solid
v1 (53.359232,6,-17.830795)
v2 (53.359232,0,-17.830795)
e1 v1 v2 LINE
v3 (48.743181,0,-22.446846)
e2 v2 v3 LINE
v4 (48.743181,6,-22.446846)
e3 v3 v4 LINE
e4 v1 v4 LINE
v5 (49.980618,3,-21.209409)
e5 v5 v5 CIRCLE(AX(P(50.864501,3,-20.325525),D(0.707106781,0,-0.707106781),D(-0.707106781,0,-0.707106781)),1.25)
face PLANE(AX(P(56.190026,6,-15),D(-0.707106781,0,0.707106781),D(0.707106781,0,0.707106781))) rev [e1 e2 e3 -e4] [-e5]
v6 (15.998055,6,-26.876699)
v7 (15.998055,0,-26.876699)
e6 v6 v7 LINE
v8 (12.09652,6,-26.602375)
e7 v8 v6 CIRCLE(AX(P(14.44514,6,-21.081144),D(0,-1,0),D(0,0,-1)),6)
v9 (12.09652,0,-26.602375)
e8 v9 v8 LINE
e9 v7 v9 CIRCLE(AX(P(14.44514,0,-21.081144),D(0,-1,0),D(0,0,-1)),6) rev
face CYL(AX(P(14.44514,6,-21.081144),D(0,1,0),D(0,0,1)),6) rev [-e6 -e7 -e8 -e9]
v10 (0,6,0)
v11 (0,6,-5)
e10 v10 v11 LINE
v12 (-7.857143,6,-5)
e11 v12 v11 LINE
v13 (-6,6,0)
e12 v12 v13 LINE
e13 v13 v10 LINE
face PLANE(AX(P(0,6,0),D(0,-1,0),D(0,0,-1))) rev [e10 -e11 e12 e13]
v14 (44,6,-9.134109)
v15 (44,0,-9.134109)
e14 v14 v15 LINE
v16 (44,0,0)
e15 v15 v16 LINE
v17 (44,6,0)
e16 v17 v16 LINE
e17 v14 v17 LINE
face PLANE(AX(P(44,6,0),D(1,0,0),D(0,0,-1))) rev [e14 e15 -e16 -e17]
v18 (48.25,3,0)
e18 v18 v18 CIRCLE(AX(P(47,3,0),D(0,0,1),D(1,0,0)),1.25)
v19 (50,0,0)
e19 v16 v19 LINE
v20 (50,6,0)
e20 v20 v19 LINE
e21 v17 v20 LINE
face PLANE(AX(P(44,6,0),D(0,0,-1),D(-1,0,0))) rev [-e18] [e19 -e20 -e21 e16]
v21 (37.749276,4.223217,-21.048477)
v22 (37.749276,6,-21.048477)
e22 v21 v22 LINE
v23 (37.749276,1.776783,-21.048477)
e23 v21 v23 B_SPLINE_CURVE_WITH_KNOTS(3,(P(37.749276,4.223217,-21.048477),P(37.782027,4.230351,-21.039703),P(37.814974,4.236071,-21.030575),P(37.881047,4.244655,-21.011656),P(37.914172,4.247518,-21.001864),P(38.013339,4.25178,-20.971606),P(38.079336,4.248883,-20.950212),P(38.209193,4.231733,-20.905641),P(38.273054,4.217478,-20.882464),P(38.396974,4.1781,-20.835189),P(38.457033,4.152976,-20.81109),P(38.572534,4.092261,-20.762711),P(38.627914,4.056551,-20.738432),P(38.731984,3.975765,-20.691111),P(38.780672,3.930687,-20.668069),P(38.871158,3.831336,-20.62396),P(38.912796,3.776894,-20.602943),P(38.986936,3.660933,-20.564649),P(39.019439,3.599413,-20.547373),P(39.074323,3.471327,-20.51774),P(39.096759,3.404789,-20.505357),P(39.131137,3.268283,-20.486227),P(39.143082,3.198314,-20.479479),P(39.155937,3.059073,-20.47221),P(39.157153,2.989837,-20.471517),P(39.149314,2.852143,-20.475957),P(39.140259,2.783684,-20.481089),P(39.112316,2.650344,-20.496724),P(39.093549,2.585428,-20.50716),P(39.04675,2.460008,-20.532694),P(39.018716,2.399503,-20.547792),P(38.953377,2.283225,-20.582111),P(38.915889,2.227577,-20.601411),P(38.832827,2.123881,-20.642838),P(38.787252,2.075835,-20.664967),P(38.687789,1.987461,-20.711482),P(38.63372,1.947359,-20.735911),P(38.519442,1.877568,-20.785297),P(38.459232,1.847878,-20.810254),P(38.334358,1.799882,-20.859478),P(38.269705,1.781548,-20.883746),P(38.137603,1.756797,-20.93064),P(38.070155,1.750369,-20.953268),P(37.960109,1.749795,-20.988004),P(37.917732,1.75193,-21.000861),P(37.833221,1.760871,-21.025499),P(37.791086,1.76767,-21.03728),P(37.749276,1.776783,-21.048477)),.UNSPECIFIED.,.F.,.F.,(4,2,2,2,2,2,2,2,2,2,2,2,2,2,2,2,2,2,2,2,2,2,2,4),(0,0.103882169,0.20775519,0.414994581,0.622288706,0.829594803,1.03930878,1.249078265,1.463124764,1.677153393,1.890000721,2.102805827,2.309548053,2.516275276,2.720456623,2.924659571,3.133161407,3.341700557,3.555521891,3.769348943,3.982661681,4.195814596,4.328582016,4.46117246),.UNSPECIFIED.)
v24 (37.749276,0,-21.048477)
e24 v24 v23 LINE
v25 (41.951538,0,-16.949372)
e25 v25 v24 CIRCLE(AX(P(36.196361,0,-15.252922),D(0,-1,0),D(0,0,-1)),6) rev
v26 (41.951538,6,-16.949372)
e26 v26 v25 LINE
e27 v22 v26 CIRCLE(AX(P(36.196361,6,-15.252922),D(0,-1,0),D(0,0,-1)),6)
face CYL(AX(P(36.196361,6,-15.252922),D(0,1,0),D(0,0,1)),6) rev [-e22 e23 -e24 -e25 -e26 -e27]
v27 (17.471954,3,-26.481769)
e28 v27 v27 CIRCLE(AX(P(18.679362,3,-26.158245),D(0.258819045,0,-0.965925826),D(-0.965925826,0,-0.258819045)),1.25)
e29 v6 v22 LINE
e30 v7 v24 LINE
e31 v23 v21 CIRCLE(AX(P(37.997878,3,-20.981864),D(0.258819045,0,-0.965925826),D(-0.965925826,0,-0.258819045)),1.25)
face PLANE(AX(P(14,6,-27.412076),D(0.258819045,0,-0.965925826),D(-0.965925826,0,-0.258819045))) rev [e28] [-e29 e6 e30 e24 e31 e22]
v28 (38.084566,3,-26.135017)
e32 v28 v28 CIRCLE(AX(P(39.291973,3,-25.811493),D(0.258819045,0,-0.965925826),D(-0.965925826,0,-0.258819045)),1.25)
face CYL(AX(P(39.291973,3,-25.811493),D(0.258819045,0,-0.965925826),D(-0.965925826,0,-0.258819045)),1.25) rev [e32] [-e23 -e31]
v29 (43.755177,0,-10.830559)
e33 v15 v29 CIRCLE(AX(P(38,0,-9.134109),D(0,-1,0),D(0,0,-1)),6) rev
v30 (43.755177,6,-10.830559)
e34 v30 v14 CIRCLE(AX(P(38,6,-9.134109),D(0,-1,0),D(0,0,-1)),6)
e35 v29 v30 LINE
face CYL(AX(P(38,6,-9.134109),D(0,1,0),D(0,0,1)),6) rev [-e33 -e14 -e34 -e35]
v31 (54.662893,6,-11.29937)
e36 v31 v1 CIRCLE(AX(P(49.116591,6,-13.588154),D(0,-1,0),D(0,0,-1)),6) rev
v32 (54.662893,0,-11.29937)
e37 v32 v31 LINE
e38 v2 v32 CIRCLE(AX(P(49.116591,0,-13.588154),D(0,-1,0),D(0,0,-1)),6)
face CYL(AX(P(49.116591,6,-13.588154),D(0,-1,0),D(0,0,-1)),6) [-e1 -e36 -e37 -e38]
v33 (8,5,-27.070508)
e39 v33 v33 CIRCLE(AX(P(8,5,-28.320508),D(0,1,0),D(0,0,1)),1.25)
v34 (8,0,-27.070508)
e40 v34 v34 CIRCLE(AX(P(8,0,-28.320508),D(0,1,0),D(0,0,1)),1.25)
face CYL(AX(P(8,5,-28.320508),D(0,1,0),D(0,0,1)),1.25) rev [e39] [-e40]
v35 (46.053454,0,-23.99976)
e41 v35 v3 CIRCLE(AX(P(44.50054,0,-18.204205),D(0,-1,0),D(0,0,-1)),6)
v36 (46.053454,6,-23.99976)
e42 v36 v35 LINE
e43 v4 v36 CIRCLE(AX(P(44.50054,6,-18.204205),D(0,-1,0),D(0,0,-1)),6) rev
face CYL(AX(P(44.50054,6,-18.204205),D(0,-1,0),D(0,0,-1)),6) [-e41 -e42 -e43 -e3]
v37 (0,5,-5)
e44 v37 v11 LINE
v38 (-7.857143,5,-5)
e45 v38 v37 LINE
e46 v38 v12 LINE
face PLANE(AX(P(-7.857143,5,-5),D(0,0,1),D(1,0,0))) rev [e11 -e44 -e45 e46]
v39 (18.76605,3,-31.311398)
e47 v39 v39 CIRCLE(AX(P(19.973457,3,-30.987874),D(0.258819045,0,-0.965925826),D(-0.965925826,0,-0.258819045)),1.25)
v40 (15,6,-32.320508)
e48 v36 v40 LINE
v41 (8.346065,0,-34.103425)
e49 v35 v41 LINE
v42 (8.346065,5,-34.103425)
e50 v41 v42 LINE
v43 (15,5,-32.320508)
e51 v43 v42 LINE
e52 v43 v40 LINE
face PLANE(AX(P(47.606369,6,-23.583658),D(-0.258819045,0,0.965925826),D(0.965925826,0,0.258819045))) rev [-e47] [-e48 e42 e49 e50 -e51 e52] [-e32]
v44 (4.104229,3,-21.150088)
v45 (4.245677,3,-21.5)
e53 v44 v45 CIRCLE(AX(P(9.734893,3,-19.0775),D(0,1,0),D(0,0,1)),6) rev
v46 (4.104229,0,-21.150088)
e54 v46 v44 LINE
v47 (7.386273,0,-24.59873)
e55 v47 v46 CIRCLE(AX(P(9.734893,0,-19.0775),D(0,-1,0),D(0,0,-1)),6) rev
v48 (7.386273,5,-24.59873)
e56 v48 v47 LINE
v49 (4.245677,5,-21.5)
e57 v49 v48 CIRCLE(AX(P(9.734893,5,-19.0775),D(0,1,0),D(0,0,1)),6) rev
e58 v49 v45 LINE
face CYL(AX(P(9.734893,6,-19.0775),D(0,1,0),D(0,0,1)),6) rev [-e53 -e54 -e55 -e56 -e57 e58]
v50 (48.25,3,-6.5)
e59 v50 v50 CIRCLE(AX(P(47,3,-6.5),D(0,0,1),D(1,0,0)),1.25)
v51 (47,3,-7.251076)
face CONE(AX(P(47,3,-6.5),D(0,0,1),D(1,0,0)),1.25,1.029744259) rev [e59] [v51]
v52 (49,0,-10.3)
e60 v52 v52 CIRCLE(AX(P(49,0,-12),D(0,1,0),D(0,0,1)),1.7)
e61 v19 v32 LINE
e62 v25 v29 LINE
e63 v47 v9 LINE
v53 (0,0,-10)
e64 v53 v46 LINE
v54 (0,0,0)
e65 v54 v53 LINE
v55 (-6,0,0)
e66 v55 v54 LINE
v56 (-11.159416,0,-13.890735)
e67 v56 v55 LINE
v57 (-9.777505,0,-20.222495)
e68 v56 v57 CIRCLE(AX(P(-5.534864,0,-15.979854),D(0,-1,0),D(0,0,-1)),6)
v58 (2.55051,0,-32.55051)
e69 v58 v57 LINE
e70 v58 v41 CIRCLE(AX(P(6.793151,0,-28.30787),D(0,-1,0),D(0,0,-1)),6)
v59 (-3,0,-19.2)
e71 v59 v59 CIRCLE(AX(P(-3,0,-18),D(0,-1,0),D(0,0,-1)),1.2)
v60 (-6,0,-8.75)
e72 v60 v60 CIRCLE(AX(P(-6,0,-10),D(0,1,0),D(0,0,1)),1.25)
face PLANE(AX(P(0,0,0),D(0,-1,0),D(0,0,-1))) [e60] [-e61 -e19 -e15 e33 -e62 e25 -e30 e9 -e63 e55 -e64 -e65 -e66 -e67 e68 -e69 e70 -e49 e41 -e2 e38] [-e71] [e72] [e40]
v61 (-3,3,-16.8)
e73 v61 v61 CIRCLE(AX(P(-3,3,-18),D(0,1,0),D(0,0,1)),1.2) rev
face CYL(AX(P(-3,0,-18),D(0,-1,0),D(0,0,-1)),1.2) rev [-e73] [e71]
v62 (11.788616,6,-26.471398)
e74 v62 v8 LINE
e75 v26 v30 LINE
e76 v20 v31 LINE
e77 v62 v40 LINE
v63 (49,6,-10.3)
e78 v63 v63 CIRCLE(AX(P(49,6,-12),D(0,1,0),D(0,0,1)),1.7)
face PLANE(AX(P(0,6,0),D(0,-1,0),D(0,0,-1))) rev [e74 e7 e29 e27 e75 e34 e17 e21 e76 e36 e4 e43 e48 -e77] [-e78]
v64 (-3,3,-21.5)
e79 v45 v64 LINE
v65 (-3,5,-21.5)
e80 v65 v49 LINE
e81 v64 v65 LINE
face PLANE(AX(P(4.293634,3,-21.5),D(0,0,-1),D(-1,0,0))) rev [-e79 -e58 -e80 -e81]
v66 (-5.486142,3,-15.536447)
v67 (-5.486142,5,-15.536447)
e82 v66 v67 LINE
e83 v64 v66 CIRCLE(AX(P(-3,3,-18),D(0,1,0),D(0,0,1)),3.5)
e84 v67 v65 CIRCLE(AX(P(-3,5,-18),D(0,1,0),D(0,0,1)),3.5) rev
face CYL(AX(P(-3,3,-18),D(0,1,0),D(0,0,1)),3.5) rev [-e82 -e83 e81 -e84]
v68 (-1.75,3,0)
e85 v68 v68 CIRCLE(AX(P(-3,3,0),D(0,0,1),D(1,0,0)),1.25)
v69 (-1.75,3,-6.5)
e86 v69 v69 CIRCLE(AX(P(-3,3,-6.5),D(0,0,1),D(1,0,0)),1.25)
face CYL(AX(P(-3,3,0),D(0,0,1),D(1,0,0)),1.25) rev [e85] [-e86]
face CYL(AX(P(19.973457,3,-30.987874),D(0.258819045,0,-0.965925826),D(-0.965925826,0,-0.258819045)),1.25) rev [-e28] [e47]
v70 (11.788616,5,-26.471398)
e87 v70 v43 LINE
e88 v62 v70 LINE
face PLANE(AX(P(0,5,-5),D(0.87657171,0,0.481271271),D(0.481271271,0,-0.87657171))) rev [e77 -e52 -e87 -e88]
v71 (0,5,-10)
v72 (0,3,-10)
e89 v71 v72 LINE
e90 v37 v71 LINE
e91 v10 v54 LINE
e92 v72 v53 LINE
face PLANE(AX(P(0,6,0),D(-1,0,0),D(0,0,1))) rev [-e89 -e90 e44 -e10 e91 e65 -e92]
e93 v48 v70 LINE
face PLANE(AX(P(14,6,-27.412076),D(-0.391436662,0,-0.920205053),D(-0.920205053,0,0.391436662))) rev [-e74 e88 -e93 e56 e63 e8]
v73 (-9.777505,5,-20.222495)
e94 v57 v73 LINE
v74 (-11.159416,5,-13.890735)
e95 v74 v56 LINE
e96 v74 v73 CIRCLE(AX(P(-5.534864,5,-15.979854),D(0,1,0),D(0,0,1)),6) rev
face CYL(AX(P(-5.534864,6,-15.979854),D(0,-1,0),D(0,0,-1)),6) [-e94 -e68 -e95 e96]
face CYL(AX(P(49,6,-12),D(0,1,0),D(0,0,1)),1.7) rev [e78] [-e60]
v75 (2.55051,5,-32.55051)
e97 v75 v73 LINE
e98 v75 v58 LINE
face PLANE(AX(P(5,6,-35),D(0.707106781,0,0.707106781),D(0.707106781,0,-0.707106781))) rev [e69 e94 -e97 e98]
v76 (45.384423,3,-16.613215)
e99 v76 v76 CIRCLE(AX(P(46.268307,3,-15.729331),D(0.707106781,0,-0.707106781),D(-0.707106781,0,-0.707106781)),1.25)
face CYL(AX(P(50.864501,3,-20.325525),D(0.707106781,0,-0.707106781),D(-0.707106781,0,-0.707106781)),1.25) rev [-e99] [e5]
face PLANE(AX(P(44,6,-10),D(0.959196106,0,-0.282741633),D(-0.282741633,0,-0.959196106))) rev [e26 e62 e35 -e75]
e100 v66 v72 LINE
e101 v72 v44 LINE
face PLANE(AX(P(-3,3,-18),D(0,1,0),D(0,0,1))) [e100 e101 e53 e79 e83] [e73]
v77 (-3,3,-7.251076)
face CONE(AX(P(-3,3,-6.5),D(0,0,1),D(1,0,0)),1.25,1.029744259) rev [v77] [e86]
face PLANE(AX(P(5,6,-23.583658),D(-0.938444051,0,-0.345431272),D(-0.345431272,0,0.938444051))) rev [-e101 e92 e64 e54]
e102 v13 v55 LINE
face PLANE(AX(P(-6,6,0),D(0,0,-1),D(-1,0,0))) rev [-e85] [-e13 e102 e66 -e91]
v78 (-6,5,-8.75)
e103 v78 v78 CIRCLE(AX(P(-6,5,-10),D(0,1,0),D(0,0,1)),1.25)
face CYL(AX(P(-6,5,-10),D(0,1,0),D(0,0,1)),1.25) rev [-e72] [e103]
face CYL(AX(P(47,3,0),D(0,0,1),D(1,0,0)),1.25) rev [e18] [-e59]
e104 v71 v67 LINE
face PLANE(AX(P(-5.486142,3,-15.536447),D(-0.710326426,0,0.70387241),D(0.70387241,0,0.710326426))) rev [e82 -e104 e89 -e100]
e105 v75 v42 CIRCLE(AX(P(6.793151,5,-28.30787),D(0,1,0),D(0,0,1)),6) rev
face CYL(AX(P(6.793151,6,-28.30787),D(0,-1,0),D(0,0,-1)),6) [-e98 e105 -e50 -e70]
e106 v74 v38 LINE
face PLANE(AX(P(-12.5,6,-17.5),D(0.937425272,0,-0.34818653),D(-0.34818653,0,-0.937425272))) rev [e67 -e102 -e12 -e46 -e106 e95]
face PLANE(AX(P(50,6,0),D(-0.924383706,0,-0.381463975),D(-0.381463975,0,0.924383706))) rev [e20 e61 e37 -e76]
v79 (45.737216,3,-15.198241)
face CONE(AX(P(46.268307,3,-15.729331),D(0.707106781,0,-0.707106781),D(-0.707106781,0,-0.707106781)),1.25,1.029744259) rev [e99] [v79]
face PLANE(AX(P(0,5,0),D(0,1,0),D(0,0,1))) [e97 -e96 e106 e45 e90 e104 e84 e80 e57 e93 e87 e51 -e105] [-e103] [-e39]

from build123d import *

# Parameters (mm, degrees)
AUFSATZ_LINEAR_AUSTRAGEN1_DEPTH  = 6
VERRUNDUNG1_R                    = 6
DURCHGANGSLOCH_F_R_M21_OUTLINE_R = 1.2
DURCHGANGSLOCH_F_R_M21_DEPTH     = 6
SCHNITT_LINEAR_AUSTRAGEN1_DEPTH  = 3
SCHNITT_LINEAR_AUSTRAGEN2_DEPTH  = 1
M3_GEWINDEBOHRUNG2_D             = 2.5
M3_GEWINDEBOHRUNG3_D             = 2.5
M3_GEWINDEBOHRUNG3_DEPTH         = 6.5
M3_GEWINDEBOHRUNG3_TIP           = 0.751075774
M3_GEWINDEBOHRUNG4_D             = 2.5
M3_GEWINDEBOHRUNG4_DEPTH         = 6.5
M3_GEWINDEBOHRUNG4_TIP           = 0.751075774
DURCHGANGSLOCH_F_R_M32_OUTLINE_R = 1.7
DURCHGANGSLOCH_F_R_M32_DEPTH     = 6


# Read off the part's stored shape, not the designer's step: Durchgangsloch für M21, M3 Gewindebohrung1, Durchgangsloch für M32
with BuildPart() as part:
    # Skizze1 → Aufsatz-Linear austragen1 (new body)
    with BuildSketch(Plane(origin=(0, 0, 0), x_dir=(1, 0, 0), z_dir=(0, 1, 0))):
        Polygon((-6, 0), (0, 0), (0, 10), (5, 23.583657959), (14, 27.412076366), (41, 20.17744817), (44, 10), (44, 0), (50, 0), (56.190026492, 15), (47.606368533, 23.583657959), (5, 35), (-12.5, 17.5), align=None)
    extrude(amount=AUFSATZ_LINEAR_AUSTRAGEN1_DEPTH)

    # Verrundung1
    verrundung1_edges = [part.edges().sort_by_distance(p)[0] for p in [
        (-12.5, 3, -17.5),
        (5, 3, -35),
        (47.606368533, 3, -23.583657959),
        (56.190026492, 3, -15),
        (44, 3, -10),
        (41, 3, -20.17744817),
        (14, 3, -27.412076366),
        (5, 3, -23.583657959),
    ]]
    fillet(verrundung1_edges, radius=VERRUNDUNG1_R)

    # Durchgangsloch für M21 outline → Durchgangsloch für M21 (cut)
    with BuildSketch(Plane(origin=(0, 0, 0), x_dir=(1, 0, 0), z_dir=(0, 1, 0))):
        with Locations((-3, 18)):
            Circle(DURCHGANGSLOCH_F_R_M21_OUTLINE_R)
    extrude(amount=DURCHGANGSLOCH_F_R_M21_DEPTH, mode=Mode.SUBTRACT)

    # M3 Gewindebohrung1 outline → M3 Gewindebohrung1 (revolve, cut)
    with BuildSketch(Plane(origin=(47, 3, 0), x_dir=(1, 0, 0), z_dir=(0, -1, 0))):
        Polygon((0, 0), (0, -7.251075774), (1.25, -6.5), (1.25, 0), align=None)
    revolve(axis=Axis((47, 3, 0), (0, 0, 1)), mode=Mode.SUBTRACT)

    # M3 Gewindebohrung1 2 outline → M3 Gewindebohrung1 2 (revolve, cut)
    with BuildSketch(Plane(origin=(-3, 3, 0), x_dir=(1, 0, 0), z_dir=(0, -1, 0))):
        Polygon((0, 0), (0, -7.251075774), (1.25, -6.5), (1.25, 0), align=None)
    revolve(axis=Axis((-3, 3, 0), (0, 0, 1)), mode=Mode.SUBTRACT)

    # Skizze8 → Schnitt-Linear austragen1 (cut)
    with BuildSketch(Plane(origin=(0, 6, 0), x_dir=(1, 0, 0), z_dir=(0, 1, 0))):
        with BuildLine():
            Line((-5.48614249, 15.536446566), (0, 10))
            Line((0, 10), (4.293633921, 21.5))
            Line((4.293633921, 21.5), (-3, 21.5))
            ThreePointArc((-3, 21.5), (-6.23051366, 19.346767052), (-5.48614249, 15.536446566))
        make_face()
    extrude(amount=-SCHNITT_LINEAR_AUSTRAGEN1_DEPTH, mode=Mode.SUBTRACT)

    # Skizze9 → Schnitt-Linear austragen2 (cut)
    with BuildSketch(Plane(origin=(0, 6, 0), x_dir=(1, 0, 0), z_dir=(0, 1, 0))):
        Polygon((-7.857142857, 5), (0, 5), (15, 32.320508076), (5, 35), (-12.5, 17.5), align=None)
    extrude(amount=-SCHNITT_LINEAR_AUSTRAGEN2_DEPTH, mode=Mode.SUBTRACT)

    # M3 Gewindebohrung2 (through all)
    with Locations(Plane(origin=(0, 5, 0), x_dir=(1, 0, 0), z_dir=(0, 1, 0))):
        with Locations((8, 28.320508076), (-6, 10)):
            Hole(M3_GEWINDEBOHRUNG2_D / 2)

    # M3 Gewindebohrung3
    with Locations(Plane(origin=(9.084936491, 0, -33.905444566), x_dir=(-0.9659258262890604, 0, -0.2588190451025504), z_dir=(0.2588190451025504, 0, -0.9659258262890604))):
        with Locations((-31.272625875, 3), (-11.272625875, 3)):
            Hole(M3_GEWINDEBOHRUNG3_D / 2, depth=M3_GEWINDEBOHRUNG3_DEPTH)
            with Locations((0, 0, -(M3_GEWINDEBOHRUNG3_DEPTH + M3_GEWINDEBOHRUNG3_TIP / 2))):  # 118° drill point
                Cone(0, M3_GEWINDEBOHRUNG3_D / 2, M3_GEWINDEBOHRUNG3_TIP, mode=Mode.SUBTRACT)

    # M3 Gewindebohrung4
    with Locations(Plane(origin=(35.595013246, 0, -35.595013246), x_dir=(-0.7071067811865515, 0, -0.7071067811865436), z_dir=(0.7071067811865436, 0, -0.7071067811865515))):
        with Locations((-21.594316704, 3)):
            Hole(M3_GEWINDEBOHRUNG4_D / 2, depth=M3_GEWINDEBOHRUNG4_DEPTH)
            with Locations((0, 0, -(M3_GEWINDEBOHRUNG4_DEPTH + M3_GEWINDEBOHRUNG4_TIP / 2))):  # 118° drill point
                Cone(0, M3_GEWINDEBOHRUNG4_D / 2, M3_GEWINDEBOHRUNG4_TIP, mode=Mode.SUBTRACT)

    # Durchgangsloch für M32 outline → Durchgangsloch für M32 (cut)
    with BuildSketch(Plane(origin=(0, 0, 0), x_dir=(1, 0, 0), z_dir=(0, 1, 0))):
        with Locations((49, 12)):
            Circle(DURCHGANGSLOCH_F_R_M32_OUTLINE_R)
    extrude(amount=DURCHGANGSLOCH_F_R_M32_DEPTH, mode=Mode.SUBTRACT)


solid = part.part
